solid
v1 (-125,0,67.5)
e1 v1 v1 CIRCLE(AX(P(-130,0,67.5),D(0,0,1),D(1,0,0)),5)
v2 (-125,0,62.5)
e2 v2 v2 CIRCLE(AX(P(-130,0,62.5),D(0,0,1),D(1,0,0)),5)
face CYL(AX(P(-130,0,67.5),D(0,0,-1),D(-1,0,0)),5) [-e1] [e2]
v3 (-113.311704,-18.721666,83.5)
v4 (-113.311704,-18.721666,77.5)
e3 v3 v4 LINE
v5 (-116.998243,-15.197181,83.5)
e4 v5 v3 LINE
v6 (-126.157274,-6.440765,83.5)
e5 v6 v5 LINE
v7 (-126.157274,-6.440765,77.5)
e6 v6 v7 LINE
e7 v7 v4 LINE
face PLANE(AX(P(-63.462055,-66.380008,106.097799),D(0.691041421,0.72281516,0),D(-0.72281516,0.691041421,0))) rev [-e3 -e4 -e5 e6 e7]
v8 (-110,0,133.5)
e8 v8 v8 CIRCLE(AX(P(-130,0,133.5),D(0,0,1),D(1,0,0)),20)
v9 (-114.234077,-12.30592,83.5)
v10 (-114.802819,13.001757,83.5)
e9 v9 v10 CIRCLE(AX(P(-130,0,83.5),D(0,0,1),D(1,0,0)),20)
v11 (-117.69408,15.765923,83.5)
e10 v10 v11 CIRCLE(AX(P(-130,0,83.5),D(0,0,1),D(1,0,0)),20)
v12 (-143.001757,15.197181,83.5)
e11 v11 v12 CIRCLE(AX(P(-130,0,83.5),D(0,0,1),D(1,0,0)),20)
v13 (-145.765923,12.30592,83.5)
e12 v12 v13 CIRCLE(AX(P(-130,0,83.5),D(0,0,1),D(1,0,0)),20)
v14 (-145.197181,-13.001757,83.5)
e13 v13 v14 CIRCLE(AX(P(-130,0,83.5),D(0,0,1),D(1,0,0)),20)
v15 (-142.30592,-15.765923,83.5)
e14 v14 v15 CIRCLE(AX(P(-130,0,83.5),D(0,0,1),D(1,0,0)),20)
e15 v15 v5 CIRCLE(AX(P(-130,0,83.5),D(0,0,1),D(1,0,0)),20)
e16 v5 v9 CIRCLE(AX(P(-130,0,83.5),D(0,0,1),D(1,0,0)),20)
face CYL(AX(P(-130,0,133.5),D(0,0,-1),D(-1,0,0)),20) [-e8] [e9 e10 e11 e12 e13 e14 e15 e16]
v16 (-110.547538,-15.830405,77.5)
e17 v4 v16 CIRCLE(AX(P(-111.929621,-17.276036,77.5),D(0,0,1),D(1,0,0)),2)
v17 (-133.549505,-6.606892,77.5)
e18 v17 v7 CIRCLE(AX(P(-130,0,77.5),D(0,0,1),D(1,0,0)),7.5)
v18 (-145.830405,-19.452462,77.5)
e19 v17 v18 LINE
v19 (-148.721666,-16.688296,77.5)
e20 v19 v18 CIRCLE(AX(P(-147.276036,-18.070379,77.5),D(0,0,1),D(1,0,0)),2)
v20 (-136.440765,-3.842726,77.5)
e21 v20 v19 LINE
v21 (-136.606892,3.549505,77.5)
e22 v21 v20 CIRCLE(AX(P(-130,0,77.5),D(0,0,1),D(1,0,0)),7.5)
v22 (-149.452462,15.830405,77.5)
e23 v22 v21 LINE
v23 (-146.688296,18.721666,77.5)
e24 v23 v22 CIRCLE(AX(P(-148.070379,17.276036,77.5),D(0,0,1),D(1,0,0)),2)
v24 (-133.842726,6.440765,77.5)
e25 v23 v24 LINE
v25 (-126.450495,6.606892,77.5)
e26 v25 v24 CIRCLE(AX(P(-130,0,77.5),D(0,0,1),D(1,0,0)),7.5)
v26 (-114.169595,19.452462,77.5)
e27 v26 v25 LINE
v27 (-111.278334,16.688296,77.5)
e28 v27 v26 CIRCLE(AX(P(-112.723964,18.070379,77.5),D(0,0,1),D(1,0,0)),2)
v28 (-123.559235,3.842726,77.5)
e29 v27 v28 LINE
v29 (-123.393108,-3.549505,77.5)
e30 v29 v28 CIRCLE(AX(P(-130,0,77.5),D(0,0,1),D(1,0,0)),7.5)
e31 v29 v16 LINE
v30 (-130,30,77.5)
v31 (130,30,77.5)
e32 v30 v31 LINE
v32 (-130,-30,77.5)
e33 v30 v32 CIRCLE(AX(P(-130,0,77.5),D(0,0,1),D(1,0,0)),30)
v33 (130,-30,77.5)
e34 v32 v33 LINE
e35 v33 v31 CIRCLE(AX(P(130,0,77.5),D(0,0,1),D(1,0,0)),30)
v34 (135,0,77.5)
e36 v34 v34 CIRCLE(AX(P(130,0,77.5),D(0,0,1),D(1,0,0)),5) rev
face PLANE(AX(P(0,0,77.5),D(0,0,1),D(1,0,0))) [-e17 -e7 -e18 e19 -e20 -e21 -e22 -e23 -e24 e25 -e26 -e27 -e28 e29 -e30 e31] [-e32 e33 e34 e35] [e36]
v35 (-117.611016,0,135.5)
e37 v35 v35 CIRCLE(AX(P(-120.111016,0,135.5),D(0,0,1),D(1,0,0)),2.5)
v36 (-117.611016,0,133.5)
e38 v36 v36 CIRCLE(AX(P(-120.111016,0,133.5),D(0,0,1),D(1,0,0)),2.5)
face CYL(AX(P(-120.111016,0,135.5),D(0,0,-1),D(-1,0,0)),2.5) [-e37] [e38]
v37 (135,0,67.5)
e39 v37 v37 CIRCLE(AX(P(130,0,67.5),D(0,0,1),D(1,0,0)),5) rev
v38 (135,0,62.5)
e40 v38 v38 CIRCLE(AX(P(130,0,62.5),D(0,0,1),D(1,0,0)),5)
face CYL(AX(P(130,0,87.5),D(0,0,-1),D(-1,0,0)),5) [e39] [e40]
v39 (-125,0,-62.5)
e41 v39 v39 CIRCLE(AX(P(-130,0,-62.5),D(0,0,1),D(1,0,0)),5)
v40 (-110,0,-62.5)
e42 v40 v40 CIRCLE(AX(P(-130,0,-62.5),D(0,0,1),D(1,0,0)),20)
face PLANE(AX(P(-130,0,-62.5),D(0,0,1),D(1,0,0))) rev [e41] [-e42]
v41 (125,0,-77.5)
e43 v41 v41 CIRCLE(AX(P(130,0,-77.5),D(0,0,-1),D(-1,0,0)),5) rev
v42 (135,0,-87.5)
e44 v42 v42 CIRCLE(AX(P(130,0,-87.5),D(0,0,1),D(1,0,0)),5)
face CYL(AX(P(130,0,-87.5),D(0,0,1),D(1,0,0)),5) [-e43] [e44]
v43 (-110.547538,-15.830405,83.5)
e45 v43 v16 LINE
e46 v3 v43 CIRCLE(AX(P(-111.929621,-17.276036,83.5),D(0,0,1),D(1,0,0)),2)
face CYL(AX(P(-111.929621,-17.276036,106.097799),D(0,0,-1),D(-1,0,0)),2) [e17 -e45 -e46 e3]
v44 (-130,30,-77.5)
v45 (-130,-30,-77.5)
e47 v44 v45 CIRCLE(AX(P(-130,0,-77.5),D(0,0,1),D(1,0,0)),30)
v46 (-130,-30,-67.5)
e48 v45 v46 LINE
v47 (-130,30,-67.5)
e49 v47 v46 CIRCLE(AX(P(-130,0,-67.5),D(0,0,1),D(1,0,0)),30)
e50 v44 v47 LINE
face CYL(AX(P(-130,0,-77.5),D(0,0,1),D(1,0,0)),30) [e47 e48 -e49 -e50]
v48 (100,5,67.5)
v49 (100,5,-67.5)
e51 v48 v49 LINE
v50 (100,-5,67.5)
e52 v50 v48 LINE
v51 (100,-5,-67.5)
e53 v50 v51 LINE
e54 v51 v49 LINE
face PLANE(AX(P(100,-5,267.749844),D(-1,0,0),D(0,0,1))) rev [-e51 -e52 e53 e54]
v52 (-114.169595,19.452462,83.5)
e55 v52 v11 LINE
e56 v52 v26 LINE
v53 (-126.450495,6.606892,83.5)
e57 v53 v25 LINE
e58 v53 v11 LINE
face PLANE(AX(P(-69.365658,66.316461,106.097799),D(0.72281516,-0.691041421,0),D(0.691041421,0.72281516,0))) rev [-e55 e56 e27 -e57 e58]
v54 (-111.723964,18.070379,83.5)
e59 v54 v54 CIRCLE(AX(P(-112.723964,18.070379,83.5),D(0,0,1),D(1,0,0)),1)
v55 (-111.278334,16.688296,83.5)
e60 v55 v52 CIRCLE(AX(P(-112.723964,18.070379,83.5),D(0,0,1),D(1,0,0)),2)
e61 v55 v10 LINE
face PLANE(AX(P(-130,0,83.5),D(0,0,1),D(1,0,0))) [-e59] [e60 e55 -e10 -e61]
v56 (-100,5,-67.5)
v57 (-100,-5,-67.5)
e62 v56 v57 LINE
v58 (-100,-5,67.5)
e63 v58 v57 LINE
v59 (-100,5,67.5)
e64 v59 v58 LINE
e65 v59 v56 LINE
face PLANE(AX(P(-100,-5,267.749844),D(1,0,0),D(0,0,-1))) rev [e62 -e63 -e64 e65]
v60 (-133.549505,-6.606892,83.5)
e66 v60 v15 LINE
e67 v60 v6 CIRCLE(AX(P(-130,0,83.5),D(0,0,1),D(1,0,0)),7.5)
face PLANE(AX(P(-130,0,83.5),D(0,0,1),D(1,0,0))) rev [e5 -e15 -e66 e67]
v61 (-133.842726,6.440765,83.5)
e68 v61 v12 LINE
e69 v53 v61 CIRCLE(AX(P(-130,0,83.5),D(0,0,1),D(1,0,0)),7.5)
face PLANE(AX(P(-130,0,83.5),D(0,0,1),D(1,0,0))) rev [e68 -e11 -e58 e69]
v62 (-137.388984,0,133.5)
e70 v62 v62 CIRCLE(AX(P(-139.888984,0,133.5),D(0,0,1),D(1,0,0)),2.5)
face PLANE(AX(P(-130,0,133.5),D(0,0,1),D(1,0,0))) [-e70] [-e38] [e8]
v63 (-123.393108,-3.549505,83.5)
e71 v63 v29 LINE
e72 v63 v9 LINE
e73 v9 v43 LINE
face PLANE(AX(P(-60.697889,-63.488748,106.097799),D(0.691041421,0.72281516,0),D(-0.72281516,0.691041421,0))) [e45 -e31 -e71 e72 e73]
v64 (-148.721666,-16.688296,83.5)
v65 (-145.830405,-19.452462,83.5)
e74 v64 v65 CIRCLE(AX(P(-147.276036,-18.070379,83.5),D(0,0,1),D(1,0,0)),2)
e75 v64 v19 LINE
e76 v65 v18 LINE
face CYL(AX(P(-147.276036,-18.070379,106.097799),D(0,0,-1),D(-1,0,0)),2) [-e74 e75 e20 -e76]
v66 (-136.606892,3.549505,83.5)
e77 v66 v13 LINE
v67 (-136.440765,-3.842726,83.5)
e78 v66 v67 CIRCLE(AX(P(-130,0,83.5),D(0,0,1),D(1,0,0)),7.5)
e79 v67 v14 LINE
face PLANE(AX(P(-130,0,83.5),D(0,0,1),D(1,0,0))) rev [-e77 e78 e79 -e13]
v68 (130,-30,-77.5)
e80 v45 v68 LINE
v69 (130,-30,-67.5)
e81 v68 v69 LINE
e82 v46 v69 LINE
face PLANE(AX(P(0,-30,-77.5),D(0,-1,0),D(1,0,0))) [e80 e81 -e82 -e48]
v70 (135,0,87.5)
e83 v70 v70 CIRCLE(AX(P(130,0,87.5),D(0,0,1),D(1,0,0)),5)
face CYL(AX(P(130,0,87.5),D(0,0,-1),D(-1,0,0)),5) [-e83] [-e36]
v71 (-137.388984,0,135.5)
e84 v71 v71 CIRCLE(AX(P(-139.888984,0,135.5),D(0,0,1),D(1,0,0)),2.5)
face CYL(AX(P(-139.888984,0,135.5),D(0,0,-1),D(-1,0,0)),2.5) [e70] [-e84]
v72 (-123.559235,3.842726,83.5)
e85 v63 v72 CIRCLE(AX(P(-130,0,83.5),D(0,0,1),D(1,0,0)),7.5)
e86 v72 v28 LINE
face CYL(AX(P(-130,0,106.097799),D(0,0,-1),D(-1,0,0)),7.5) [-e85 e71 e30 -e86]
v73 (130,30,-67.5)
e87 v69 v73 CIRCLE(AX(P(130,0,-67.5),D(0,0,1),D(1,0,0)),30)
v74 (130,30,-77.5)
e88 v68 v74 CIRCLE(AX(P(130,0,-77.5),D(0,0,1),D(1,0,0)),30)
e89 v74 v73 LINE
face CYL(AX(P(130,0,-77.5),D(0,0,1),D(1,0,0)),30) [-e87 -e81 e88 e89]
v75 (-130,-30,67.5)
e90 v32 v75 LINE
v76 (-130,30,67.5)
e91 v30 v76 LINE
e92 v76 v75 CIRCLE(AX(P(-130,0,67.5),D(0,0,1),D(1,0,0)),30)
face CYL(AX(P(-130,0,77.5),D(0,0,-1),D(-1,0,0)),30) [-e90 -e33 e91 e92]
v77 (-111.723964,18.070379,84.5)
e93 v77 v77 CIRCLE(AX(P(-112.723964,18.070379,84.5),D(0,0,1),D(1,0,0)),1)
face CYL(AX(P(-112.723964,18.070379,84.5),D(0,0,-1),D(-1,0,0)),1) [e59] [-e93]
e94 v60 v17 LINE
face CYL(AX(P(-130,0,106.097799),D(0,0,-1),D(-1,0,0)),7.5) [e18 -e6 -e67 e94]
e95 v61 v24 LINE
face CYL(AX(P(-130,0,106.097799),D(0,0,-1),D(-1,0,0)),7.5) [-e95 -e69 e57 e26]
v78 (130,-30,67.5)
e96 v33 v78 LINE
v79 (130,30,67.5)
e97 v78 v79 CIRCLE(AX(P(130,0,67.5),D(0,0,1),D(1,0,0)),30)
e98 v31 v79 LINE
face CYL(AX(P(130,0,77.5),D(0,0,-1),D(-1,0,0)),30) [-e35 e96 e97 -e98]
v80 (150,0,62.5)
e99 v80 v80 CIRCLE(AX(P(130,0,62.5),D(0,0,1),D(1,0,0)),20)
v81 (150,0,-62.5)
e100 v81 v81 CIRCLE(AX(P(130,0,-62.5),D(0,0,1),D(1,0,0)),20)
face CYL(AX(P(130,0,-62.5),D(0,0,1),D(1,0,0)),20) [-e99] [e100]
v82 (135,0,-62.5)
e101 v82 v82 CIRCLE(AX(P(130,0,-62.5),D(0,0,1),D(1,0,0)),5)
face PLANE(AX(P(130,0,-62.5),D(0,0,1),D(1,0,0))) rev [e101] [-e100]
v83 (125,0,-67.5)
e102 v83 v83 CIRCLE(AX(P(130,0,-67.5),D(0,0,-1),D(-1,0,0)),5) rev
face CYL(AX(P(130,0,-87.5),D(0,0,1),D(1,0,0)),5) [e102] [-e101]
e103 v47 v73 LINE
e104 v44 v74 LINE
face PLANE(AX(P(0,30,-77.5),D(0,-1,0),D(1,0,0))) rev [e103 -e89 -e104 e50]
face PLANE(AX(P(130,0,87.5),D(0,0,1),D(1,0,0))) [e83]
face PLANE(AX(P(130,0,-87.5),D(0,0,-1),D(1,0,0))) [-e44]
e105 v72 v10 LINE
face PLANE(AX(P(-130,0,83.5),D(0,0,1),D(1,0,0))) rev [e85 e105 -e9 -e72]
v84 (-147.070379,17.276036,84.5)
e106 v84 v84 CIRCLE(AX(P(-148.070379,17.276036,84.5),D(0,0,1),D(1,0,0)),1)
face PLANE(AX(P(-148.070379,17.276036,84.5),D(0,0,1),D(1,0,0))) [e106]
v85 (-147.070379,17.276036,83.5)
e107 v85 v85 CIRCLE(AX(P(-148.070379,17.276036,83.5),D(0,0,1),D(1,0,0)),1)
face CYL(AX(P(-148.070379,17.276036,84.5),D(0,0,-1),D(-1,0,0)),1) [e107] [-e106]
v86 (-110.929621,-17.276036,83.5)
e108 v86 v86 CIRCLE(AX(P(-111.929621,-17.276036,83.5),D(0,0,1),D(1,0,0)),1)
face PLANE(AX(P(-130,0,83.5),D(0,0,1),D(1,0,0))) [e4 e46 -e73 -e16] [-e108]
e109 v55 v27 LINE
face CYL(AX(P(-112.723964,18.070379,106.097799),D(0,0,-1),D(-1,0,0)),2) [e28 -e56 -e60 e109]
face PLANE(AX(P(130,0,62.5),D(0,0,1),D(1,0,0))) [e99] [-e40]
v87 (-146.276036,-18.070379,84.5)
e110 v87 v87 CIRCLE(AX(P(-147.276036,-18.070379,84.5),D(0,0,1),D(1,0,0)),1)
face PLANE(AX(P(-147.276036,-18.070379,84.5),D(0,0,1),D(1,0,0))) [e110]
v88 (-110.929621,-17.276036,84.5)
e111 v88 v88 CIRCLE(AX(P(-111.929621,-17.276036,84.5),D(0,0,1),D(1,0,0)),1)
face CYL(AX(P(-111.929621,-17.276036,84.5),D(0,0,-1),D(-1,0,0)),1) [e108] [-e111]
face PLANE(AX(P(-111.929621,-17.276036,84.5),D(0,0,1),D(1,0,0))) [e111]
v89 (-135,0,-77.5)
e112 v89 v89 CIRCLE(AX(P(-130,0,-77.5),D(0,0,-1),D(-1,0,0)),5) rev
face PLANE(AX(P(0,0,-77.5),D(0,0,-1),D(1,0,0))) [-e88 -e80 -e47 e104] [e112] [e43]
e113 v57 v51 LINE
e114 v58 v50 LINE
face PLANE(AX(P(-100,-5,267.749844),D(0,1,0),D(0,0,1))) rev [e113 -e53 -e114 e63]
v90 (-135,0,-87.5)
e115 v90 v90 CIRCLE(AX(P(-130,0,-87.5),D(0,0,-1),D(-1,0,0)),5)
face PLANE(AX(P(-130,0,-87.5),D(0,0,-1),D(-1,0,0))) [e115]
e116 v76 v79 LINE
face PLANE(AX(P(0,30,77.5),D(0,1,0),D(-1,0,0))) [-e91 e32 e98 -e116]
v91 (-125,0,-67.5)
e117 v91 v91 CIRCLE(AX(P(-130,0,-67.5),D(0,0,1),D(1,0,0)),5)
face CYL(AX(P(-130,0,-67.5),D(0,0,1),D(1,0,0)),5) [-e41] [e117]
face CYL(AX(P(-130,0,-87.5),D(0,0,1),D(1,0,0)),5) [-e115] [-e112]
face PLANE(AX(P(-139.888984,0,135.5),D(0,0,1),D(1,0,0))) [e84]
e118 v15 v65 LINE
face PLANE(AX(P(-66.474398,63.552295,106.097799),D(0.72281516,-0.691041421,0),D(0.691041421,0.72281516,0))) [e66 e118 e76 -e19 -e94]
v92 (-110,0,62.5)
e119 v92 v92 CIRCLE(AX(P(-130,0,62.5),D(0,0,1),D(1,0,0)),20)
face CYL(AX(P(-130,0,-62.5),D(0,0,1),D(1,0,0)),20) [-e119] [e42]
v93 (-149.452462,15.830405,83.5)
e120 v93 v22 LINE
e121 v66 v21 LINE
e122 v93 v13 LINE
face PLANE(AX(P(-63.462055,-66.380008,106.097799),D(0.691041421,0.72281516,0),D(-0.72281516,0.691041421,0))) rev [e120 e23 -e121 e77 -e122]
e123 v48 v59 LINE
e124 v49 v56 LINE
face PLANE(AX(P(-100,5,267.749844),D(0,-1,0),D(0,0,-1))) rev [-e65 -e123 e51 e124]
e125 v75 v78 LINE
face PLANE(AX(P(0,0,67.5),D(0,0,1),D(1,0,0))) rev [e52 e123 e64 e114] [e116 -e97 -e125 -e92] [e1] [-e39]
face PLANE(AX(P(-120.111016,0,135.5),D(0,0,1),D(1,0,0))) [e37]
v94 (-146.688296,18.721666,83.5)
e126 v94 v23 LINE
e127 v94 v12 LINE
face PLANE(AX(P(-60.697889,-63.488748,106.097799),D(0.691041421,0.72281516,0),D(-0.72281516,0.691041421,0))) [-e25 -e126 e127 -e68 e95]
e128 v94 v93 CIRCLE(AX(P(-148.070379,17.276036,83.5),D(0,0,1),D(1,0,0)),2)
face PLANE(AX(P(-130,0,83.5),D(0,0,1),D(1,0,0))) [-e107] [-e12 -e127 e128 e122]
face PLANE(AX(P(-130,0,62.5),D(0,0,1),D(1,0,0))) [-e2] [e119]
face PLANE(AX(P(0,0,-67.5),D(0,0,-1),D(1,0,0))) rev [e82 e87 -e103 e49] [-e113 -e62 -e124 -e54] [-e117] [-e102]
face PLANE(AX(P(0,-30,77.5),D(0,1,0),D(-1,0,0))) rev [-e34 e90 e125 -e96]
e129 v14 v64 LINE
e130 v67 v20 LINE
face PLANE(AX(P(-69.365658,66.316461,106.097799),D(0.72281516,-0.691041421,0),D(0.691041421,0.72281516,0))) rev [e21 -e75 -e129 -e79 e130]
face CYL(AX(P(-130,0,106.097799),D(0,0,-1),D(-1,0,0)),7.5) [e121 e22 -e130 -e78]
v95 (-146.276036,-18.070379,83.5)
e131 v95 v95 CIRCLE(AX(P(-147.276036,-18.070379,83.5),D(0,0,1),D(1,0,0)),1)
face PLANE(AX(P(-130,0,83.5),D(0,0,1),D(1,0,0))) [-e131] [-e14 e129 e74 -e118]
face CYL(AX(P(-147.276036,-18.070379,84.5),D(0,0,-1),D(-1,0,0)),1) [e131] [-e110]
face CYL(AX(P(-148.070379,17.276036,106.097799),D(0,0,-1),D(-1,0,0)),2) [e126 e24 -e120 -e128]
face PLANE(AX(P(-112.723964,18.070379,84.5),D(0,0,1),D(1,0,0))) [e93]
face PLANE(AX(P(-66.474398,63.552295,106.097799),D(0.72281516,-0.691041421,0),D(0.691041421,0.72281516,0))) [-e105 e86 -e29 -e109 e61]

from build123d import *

# Parameters (mm, degrees)
BOSS_EXTRUDE1_DEPTH        = 62.5
BOSS_EXTRUDE1_DEPTH_BACK   = 62.5
SKETCH2_R                  = 20
BOSS_EXTRUDE1_2_DEPTH      = 62.5
BOSS_EXTRUDE1_2_DEPTH_BACK = 62.5
SKETCH4_R                  = 5
BOSS_EXTRUDE5_DEPTH        = 5
SKETCH9_R                  = 5
BOSS_EXTRUDE6_DEPTH        = 25
BOSS_EXTRUDE8_OUTLINE_R    = 5
BOSS_EXTRUDE8_DEPTH        = 10
SKETCH12_W                 = 200
SKETCH12_H                 = 10
BOSS_EXTRUDE9_DEPTH        = 135
SKETCH15_R                 = 5
BOSS_EXTRUDE10_DEPTH       = 6
SKETCH16_R                 = 20
BOSS_EXTRUDE11_DEPTH       = 50
MIRROR6_COPY_1_SKETCH_R    = 5
MIRROR6_COPY_1_DEPTH       = 25
MIRROR6_COPY_2_SKETCH_R    = 5
MIRROR6_COPY_2_DEPTH       = 25
SKETCH17_R                 = 2.5
BOSS_EXTRUDE12_DEPTH       = 2
BOSS_EXTRUDE13_START       = 6
SKETCH18_R                 = 5
BOSS_EXTRUDE13_DEPTH       = 6
SKETCH20_R                 = 1
BOSS_EXTRUDE15_DEPTH       = 1


# Read off the part's stored shape, not the designer's step: Boss-Extrude8
with BuildPart() as part:
    # Sketch2 → Boss-Extrude1 (new, two sides: drawn at the far end of the back side and taken through both)
    with BuildSketch(Plane.XY.offset(-BOSS_EXTRUDE1_DEPTH_BACK)):
        with Locations((-130, 0)):
            Circle(SKETCH2_R)
    extrude(amount=BOSS_EXTRUDE1_DEPTH + BOSS_EXTRUDE1_DEPTH_BACK)

    # Sketch4 → Boss-Extrude5 (add)
    with BuildSketch(Plane.XY.offset(62.5)):
        with Locations((-130, 0)):
            Circle(SKETCH4_R)
    boss_extrude5 = extrude(amount=BOSS_EXTRUDE5_DEPTH)

    # Mirror2: Boss-Extrude5 across plane
    add(boss_extrude5.mirror(Plane.XY))



with BuildPart() as body_2:
    # Sketch2 → Boss-Extrude1 2 (new, two sides: drawn at the far end of the back side and taken through both)
    with BuildSketch(Plane.XY.offset(-BOSS_EXTRUDE1_2_DEPTH_BACK)):
        with Locations((130, 0)):
            Circle(SKETCH2_R)
    extrude(amount=BOSS_EXTRUDE1_2_DEPTH + BOSS_EXTRUDE1_2_DEPTH_BACK)

    # Sketch9 → Boss-Extrude6 (add)
    with BuildSketch(Plane.XY.offset(62.5)):
        with Locations((130, 0)):
            Circle(SKETCH9_R)
    boss_extrude6 = extrude(amount=BOSS_EXTRUDE6_DEPTH)

    # Mirror4: Boss-Extrude6 across plane
    add(boss_extrude6.mirror(Plane.XY))


with BuildPart() as part_1:
    add(part.part)

    add(body_2.part)  # Boss-Extrude8 merges body 2
    # Boss-Extrude8 outline → Boss-Extrude8 (add)
    with BuildSketch(Plane.XY.offset(67.5)):
        with BuildLine():
            ThreePointArc((130, -30), (160, 0), (130, 30))
            Line((130, 30), (-130, 30))
            ThreePointArc((-130, 30), (-160, 0), (-130, -30))
            Line((-130, -30), (130, -30))
        make_face()
        with Locations((130, 0)):
            Circle(BOSS_EXTRUDE8_OUTLINE_R, mode=Mode.SUBTRACT)
    boss_extrude8 = extrude(amount=BOSS_EXTRUDE8_DEPTH)

    # Mirror5: Boss-Extrude8 across plane
    add(boss_extrude8.mirror(Plane.XY))

    # Sketch12 → Boss-Extrude9 (add)
    with BuildSketch(Plane.XY.offset(-67.5)):
        Rectangle(SKETCH12_W, SKETCH12_H)
    extrude(amount=BOSS_EXTRUDE9_DEPTH)

    # Sketch15 → Boss-Extrude10 (add)
    with BuildSketch(Plane.XY.offset(77.5)):
        with Locations((-130, 0)):
            Circle(SKETCH15_R)
    extrude(amount=BOSS_EXTRUDE10_DEPTH)

    # Sketch16 → Boss-Extrude11 (add)
    with BuildSketch(Plane.XY.offset(83.5)):
        with Locations((-130, 0)):
            Circle(SKETCH16_R)
    extrude(amount=BOSS_EXTRUDE11_DEPTH)

    # Mirror6 copy 1 sketch → Mirror6 copy 1 (add)
    with BuildSketch(Plane(origin=(0, 0, -62.5), x_dir=(-1, 0, 0), z_dir=(0, 0, -1))):
        with Locations((130, 0)):
            Circle(MIRROR6_COPY_1_SKETCH_R)
    extrude(amount=MIRROR6_COPY_1_DEPTH)

    # Mirror6 copy 2 sketch → Mirror6 copy 2 (add)
    with BuildSketch(Plane(origin=(0, 0, 62.5), x_dir=(-1, 0, 0), z_dir=(0, 0, 1))):
        with Locations((130, 0)):
            Circle(MIRROR6_COPY_2_SKETCH_R)
    extrude(amount=MIRROR6_COPY_2_DEPTH)

    # Sketch17 → Boss-Extrude12 (add)
    with BuildSketch(Plane.XY.offset(133.5)):
        with Locations((-139.88898439, 0)):
            Circle(SKETCH17_R)
        with Locations((-120.11101561, 0)):
            Circle(SKETCH17_R)
    extrude(amount=BOSS_EXTRUDE12_DEPTH)

    # Sketch18 → Boss-Extrude13 (add)
    with BuildSketch(Plane.XY.offset(77.5).offset(BOSS_EXTRUDE13_START)):
        with BuildLine():
            Line((-133.842725931, 6.440765282), (-146.688296152, 18.721665833))
            ThreePointArc((-146.688296152, 18.721665833), (-149.516009312, 18.658118354), (-149.452461834, 15.830405194))
            Line((-149.452461834, 15.830405194), (-136.606891613, 3.549504643))
            ThreePointArc((-136.606891613, 3.549504643), (-137.498106816, -0.168505698), (-136.440765282, -3.842725931))
            Line((-136.440765282, -3.842725931), (-148.721665833, -16.688296152))
            ThreePointArc((-148.721665833, -16.688296152), (-148.658118354, -19.516009312), (-145.830405194, -19.452461834))
            Line((-145.830405194, -19.452461834), (-133.549504643, -6.606891613))
            ThreePointArc((-133.549504643, -6.606891613), (-129.831494302, -7.498106816), (-126.157274069, -6.440765282))
            Line((-126.157274069, -6.440765282), (-113.311703848, -18.721665833))
            ThreePointArc((-113.311703848, -18.721665833), (-110.483990688, -18.658118354), (-110.547538166, -15.830405194))
            Line((-110.547538166, -15.830405194), (-123.393108387, -3.549504643))
            ThreePointArc((-123.393108387, -3.549504643), (-122.501893184, 0.168505698), (-123.559234718, 3.842725931))
            Line((-123.559234718, 3.842725931), (-111.278334167, 16.688296152))
            ThreePointArc((-111.278334167, 16.688296152), (-111.341881646, 19.516009312), (-114.169594806, 19.452461834))
            Line((-114.169594806, 19.452461834), (-126.450495357, 6.606891613))
            ThreePointArc((-126.450495357, 6.606891613), (-130.168505698, 7.498106816), (-133.842725931, 6.440765282))
        make_face()
        with Locations((-130, 0)):
            Circle(SKETCH18_R, mode=Mode.SUBTRACT)
    extrude(amount=-BOSS_EXTRUDE13_DEPTH)

    # Sketch20 → Boss-Extrude15 (add)
    with BuildSketch(Plane.XY.offset(83.5)):
        with Locations((-148.070378993, 17.276035513)):
            Circle(SKETCH20_R)
        with Locations((-112.723964487, 18.070378993)):
            Circle(SKETCH20_R)
        with Locations((-147.276035513, -18.070378993)):
            Circle(SKETCH20_R)
        with Locations((-111.929621007, -17.276035513)):
            Circle(SKETCH20_R)
    extrude(amount=BOSS_EXTRUDE15_DEPTH)


solid = part_1.part
